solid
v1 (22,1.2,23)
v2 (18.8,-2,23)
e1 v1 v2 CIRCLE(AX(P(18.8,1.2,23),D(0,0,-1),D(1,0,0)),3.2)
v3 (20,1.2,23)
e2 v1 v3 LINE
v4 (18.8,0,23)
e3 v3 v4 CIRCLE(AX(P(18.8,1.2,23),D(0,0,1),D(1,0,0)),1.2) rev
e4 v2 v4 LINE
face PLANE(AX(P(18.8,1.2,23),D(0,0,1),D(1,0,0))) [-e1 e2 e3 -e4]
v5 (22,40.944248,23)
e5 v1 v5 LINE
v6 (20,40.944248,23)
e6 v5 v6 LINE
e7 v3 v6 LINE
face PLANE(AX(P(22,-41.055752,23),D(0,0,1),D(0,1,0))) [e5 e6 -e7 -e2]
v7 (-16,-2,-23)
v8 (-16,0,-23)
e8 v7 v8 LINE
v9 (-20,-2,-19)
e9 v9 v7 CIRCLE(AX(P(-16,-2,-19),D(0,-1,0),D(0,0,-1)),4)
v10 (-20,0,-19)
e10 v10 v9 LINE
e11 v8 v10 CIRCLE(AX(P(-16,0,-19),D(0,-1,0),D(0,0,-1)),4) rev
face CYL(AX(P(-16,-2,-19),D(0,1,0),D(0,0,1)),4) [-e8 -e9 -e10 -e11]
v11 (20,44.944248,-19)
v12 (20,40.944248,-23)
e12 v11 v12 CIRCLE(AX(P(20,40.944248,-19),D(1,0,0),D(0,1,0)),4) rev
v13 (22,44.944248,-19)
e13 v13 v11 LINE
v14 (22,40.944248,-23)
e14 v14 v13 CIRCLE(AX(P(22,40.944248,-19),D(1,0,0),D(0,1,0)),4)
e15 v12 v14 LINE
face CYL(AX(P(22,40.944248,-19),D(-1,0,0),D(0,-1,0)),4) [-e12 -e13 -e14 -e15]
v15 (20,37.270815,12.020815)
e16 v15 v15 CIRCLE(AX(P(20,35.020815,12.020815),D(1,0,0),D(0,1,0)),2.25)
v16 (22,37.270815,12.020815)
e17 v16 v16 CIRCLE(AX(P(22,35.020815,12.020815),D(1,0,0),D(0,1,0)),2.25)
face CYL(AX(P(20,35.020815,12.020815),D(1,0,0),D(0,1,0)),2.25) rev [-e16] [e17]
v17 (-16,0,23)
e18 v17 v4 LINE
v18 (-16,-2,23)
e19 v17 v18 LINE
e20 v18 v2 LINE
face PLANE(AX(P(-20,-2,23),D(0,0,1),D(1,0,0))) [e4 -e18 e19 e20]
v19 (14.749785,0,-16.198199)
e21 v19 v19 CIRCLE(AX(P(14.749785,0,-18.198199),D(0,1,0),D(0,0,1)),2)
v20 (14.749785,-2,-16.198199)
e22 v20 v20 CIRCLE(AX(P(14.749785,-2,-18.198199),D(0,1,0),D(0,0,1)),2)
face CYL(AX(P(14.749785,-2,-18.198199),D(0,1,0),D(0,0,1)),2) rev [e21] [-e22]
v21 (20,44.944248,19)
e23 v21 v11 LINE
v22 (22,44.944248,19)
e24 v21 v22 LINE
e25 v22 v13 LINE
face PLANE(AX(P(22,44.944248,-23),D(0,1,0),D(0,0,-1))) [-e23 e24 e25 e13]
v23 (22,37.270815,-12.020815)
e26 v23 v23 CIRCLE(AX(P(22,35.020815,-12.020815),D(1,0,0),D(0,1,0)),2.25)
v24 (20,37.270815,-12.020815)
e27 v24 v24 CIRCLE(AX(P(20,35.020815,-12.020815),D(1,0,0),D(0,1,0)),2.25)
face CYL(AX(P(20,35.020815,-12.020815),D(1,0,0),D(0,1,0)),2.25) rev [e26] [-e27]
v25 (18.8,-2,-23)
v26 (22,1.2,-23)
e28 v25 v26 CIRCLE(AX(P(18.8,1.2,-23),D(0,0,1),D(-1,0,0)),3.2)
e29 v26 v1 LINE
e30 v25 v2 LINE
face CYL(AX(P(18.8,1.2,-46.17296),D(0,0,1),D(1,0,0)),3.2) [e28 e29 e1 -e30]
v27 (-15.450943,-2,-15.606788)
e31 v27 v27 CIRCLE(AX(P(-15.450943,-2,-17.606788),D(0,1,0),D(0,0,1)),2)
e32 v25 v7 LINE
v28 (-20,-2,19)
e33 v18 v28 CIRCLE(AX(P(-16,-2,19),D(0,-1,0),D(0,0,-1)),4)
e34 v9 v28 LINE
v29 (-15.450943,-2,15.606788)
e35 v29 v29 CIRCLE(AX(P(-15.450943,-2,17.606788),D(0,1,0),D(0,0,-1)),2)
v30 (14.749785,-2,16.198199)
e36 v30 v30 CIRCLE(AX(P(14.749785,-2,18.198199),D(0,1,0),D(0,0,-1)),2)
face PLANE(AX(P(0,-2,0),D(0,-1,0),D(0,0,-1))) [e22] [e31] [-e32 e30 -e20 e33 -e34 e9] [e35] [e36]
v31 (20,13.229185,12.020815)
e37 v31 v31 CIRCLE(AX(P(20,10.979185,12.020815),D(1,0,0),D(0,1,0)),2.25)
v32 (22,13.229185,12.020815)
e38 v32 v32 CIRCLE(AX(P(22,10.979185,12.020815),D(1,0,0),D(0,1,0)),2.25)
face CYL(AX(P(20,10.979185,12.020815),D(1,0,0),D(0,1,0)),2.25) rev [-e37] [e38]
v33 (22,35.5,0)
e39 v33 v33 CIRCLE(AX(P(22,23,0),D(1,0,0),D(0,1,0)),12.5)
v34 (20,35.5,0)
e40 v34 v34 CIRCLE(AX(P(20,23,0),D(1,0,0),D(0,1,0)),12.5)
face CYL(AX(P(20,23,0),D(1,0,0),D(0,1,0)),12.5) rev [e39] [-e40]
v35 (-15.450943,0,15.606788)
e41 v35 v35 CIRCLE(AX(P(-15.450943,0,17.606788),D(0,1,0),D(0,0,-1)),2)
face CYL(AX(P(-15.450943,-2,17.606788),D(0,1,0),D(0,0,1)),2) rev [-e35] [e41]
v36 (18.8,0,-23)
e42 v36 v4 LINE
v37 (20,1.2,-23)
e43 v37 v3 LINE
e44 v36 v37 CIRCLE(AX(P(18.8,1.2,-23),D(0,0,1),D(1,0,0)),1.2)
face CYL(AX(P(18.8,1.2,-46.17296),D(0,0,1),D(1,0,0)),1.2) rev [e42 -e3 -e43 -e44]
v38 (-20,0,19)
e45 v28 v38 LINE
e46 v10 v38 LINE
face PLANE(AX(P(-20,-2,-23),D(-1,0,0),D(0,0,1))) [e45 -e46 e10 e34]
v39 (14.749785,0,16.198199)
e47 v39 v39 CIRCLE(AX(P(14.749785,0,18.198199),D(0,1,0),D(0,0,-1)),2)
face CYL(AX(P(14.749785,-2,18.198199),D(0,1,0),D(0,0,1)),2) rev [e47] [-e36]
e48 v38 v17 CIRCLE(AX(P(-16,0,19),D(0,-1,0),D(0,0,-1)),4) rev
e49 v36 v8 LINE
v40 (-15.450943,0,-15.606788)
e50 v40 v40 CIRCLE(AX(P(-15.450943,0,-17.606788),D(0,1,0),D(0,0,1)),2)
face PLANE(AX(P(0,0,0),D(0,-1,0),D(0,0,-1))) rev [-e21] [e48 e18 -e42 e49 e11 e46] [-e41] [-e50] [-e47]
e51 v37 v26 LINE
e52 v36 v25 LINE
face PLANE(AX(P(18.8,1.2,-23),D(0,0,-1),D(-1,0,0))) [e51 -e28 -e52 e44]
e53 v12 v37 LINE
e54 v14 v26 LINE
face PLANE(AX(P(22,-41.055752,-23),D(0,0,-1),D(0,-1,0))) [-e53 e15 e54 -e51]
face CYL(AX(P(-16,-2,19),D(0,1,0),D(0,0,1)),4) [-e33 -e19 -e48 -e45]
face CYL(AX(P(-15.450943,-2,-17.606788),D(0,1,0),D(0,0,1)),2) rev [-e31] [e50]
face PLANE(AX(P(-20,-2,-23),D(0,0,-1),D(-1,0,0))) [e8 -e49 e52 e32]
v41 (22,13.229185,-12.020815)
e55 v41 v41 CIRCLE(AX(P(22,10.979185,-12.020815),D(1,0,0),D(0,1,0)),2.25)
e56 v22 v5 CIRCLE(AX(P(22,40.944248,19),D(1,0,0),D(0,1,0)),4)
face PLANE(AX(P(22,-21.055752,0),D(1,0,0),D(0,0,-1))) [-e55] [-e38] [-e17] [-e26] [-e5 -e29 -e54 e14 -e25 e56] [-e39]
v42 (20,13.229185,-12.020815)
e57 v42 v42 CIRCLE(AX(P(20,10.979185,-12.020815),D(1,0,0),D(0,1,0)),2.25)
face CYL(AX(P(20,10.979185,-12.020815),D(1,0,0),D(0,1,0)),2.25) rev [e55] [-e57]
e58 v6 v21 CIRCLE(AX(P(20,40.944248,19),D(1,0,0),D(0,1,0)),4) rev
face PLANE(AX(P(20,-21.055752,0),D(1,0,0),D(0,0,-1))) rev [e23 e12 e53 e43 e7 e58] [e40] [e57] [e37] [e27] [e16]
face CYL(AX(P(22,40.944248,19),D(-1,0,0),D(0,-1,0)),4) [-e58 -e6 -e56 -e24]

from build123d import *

# Parameters (mm, degrees)
BASE_FLANGE1_DEPTH     = 2
SKETCHED_START         = -23
SKETCHED_BEND1_DEPTH   = 46
SKETCHED_BEND1_2_DEPTH = 46
SKETCH7_R              = 12.5
SKETCH7_R_2            = 2.25
CUT_EXTRUDE1_DEPTH     = 2
SKETCH8_R              = 2
CUT_EXTRUDE2_DEPTH     = 2
FILLET1_R              = 4


# Read off the part's stored shape, not the designer's step: Sketched Bend1
# Sheet-metal steps are written as plain solids
with BuildPart() as part:
    # Sketch1 → Base-Flange1 (new body)
    with BuildSketch(Plane(origin=(0, 0, 0), x_dir=(1, 0, 0), z_dir=(0, 1, 0))):
        Polygon((-20, 23), (20, 23), (66, 23), (66, -23), (20, -23), (-20, -23), align=None)
    extrude(amount=-BASE_FLANGE1_DEPTH)

    # Sketched Bend1 outline → Sketched Bend1 (cut)
    with BuildSketch(Plane.XY.offset(SKETCHED_START)):
        with BuildLine():
            Line((66, 0), (21.766479395, 0))
            ThreePointArc((21.766479395, 0), (20.588854382, -1.453299832), (18.8, -2))
            Line((18.8, -2), (66, -2))
            Line((66, -2), (66, 0))
        make_face()
    extrude(amount=SKETCHED_BEND1_DEPTH, mode=Mode.SUBTRACT)

    # Sketched Bend1 2 outline → Sketched Bend1 2 (add)
    with BuildSketch(Plane.XY.offset(SKETCHED_START)):
        with BuildLine():
            Line((20, 44.944248081), (20, 1.2))
            ThreePointArc((20, 1.2), (19.648528137, 0.351471863), (18.8, 0))
            Line((18.8, 0), (21.766479395, 0))
            ThreePointArc((21.766479395, 0), (21.941077368, 0.58874476), (22, 1.2))
            Line((22, 1.2), (22, 44.944248081))
            Line((22, 44.944248081), (20, 44.944248081))
        make_face()
    extrude(amount=SKETCHED_BEND1_2_DEPTH)

    # Sketch7 → Cut-Extrude1 (cut)
    with BuildSketch(Plane(origin=(22, 0, 0), x_dir=(0, 0, -1), z_dir=(1, 0, 0))):
        with Locations(Location((0, 23, 0), (0, 0, 90))):
            Circle(SKETCH7_R)
        with Locations(Location((12.02081528, 35.02081528, 0), (0, 0, 90))):
            Circle(SKETCH7_R_2)
        with Locations(Location((12.02081528, 10.97918472, 0), (0, 0, 90))):
            Circle(SKETCH7_R_2)
        with Locations(Location((-12.02081528, 10.97918472, 0), (0, 0, 90))):
            Circle(SKETCH7_R_2)
        with Locations(Location((-12.02081528, 35.02081528, 0), (0, 0, 90))):
            Circle(SKETCH7_R_2)
    extrude(amount=-CUT_EXTRUDE1_DEPTH, mode=Mode.SUBTRACT)

    # Sketch8 → Cut-Extrude2 (cut)
    with BuildSketch(Plane(origin=(0, 0, 0), x_dir=(1, 0, 0), z_dir=(0, 1, 0))):
        with Locations(Location((-15.450942979, 17.606788068, 0), (0, 0, 270))):
            Circle(SKETCH8_R)
        with Locations(Location((-15.450942979, -17.606788068, 0), (0, 0, 90))):
            Circle(SKETCH8_R)
        with Locations(Location((14.749785428, 18.198199219, 0), (0, 0, 270))):
            Circle(SKETCH8_R)
        with Locations(Location((14.749785428, -18.198199219, 0), (0, 0, 90))):
            Circle(SKETCH8_R)
    extrude(amount=-CUT_EXTRUDE2_DEPTH, mode=Mode.SUBTRACT)

    # Fillet1
    fillet1_edges = [part.edges().sort_by_distance(p)[0] for p in [
        (21, 44.944248081, -23),
        (21, 44.944248081, 23),
        (-20, -1, 23),
        (-20, -1, -23),
    ]]
    fillet(fillet1_edges, radius=FILLET1_R)


solid = part.part
